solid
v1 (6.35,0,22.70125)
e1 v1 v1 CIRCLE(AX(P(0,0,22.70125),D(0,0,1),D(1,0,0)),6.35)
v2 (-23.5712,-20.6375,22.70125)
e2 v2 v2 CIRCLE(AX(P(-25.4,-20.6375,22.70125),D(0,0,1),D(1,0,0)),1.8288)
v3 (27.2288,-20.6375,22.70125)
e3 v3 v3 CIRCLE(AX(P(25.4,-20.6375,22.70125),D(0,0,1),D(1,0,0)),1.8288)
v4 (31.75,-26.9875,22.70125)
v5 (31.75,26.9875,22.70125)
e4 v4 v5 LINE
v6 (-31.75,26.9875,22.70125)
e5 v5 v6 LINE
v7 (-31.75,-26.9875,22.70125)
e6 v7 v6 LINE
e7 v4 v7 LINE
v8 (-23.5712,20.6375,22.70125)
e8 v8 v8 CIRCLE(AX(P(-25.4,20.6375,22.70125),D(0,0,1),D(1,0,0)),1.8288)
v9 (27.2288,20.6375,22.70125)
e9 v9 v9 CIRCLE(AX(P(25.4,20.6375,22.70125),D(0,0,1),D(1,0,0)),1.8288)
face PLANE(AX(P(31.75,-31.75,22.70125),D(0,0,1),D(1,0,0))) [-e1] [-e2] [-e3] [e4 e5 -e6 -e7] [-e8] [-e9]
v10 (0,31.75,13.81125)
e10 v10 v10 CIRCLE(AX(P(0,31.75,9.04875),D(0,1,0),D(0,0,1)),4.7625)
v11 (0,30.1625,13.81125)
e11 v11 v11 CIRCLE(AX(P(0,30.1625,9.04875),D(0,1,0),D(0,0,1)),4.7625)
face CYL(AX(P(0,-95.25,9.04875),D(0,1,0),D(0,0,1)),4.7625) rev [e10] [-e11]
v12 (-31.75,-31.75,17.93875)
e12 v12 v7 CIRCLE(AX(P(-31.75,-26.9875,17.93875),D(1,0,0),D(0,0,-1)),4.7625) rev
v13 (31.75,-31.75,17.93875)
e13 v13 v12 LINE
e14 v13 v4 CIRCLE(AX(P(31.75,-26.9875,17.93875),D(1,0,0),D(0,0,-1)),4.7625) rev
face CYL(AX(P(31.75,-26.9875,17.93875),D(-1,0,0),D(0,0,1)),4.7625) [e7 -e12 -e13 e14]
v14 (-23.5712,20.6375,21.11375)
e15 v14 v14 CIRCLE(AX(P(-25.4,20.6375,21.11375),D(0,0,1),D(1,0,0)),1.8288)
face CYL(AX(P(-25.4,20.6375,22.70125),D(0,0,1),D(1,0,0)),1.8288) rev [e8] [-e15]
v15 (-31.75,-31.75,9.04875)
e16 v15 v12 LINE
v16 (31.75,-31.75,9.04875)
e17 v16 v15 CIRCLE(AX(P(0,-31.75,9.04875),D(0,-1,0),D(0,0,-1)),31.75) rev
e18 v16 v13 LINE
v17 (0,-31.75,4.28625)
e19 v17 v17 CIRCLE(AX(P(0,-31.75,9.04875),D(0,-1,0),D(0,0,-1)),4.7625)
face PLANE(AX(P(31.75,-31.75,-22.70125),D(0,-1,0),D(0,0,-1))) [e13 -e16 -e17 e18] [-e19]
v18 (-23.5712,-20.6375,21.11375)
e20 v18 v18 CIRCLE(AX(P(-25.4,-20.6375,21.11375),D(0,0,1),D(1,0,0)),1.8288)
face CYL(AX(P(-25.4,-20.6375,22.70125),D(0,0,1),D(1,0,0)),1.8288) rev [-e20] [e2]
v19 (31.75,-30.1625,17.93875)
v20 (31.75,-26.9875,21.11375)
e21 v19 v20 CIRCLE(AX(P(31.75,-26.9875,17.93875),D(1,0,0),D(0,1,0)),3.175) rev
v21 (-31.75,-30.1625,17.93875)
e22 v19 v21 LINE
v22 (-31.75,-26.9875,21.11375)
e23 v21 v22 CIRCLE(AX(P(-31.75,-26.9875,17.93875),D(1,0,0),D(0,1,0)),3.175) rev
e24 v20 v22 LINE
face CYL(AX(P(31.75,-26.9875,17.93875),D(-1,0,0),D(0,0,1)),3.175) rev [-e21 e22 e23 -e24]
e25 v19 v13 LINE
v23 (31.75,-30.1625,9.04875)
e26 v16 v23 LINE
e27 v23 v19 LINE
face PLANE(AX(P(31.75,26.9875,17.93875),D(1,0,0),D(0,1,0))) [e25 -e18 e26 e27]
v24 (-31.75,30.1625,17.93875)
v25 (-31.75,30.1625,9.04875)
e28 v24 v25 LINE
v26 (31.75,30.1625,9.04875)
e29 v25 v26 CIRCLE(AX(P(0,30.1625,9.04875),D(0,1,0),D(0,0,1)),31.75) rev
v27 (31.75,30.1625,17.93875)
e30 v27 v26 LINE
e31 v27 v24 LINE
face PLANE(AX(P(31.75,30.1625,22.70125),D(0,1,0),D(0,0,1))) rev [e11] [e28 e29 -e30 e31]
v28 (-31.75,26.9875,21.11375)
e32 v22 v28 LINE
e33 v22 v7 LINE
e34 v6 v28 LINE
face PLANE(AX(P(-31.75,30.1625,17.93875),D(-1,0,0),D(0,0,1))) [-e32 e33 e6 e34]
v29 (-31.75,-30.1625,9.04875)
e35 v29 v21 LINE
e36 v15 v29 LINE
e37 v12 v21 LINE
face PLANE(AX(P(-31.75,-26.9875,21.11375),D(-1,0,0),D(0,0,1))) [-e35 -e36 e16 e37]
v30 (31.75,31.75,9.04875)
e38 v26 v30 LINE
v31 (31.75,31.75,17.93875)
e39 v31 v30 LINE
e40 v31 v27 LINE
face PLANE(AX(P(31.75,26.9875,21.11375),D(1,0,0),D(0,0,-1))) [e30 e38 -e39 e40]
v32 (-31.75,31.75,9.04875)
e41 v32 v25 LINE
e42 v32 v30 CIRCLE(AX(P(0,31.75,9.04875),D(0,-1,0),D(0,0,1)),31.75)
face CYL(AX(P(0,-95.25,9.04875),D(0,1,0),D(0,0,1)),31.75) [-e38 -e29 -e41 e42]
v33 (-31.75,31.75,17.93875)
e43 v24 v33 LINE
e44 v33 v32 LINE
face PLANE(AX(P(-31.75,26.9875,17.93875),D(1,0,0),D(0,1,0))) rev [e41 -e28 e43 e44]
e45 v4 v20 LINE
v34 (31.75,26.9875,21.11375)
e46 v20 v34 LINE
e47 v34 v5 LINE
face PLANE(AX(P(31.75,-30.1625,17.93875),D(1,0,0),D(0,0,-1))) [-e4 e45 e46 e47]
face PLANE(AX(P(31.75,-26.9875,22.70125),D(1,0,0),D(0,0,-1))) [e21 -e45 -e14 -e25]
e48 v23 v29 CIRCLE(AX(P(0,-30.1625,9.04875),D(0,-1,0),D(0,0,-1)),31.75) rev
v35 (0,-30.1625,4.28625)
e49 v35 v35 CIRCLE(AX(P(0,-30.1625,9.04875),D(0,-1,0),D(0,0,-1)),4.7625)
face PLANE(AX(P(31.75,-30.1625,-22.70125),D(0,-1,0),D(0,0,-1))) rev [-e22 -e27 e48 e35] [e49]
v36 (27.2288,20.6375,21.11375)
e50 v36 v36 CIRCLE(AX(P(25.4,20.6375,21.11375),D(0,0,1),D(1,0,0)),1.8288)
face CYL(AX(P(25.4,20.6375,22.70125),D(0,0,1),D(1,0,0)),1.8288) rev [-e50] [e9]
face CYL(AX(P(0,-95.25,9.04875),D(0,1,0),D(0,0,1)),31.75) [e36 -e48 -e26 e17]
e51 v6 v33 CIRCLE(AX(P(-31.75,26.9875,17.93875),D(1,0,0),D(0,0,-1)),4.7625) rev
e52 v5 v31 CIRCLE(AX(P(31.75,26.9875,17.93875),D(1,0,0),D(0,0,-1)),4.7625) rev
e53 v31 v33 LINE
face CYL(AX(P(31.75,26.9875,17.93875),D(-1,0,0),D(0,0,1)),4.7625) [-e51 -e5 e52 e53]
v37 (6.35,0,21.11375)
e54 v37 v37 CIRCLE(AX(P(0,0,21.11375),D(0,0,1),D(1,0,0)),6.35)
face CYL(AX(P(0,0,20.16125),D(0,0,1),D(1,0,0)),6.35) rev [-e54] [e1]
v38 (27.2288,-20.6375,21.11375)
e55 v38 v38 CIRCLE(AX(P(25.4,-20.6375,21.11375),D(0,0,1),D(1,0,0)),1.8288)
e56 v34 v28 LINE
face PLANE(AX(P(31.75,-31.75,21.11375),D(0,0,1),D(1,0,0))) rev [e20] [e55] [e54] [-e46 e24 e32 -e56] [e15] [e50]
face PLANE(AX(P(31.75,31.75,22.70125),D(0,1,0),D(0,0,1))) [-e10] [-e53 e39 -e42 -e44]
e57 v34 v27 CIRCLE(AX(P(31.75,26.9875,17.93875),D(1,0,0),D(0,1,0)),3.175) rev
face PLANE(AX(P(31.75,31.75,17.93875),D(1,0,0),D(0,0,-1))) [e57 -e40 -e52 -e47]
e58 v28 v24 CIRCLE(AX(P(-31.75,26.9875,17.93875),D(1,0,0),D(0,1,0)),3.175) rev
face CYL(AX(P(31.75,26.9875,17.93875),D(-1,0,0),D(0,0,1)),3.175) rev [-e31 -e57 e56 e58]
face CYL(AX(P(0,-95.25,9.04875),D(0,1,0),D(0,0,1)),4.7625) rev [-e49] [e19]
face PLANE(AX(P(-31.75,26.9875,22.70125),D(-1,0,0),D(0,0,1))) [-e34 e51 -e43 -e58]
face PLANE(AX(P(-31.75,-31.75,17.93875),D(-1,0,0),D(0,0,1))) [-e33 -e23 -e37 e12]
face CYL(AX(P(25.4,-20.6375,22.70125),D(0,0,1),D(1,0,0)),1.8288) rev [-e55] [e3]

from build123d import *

# Parameters (mm, degrees)
BASE_FLANGE1_DEPTH          = 31.75
SKETCH6_R                   = 4.7625
CUT_EXTRUDE1_DEPTH          = 127
F_27_0_144_DIAMETER_HOLE1_D = 3.6576
SKETCH11_R                  = 6.35
CUT_EXTRUDE2_DEPTH          = 2.54


# Sheet-metal steps are written as plain solids
with BuildPart() as part:
    # Sketch1 → Base-Flange1 (new, symmetric)
    with BuildSketch(Plane.YZ):
        with BuildLine():
            Line((-31.75, -22.70125), (-31.75, 17.93875))
            ThreePointArc((-31.75, 17.93875), (-30.355096045, 21.306346045), (-26.9875, 22.70125))
            Line((-26.9875, 22.70125), (26.9875, 22.70125))
            ThreePointArc((26.9875, 22.70125), (30.355096045, 21.306346045), (31.75, 17.93875))
            Line((31.75, 17.93875), (31.75, -22.70125))
            Line((31.75, -22.70125), (30.1625, -22.70125))
            Line((30.1625, -22.70125), (30.1625, 17.93875))
            ThreePointArc((30.1625, 17.93875), (29.23256403, 20.18381403), (26.9875, 21.11375))
            Line((26.9875, 21.11375), (-26.9875, 21.11375))
            ThreePointArc((-26.9875, 21.11375), (-29.23256403, 20.18381403), (-30.1625, 17.93875))
            Line((-30.1625, 17.93875), (-30.1625, -22.70125))
            Line((-30.1625, -22.70125), (-31.75, -22.70125))
        make_face()
    extrude(amount=BASE_FLANGE1_DEPTH, both=True)

    # Sketch6 → Cut-Extrude1 (cut)
    with BuildSketch(Plane(origin=(0, 31.75, 0), x_dir=(-1, 0, 0), z_dir=(0, 1, 0))):
        with Locations(Location((0, 9.04875, 0), (0, 0, 270))):
            Circle(SKETCH6_R)
        with BuildLine():
            Line((-31.75, 9.04875), (-31.75, -117.95125))
            Line((-31.75, -117.95125), (31.75, -117.95125))
            Line((31.75, -117.95125), (31.75, 9.04875))
            ThreePointArc((31.75, 9.04875), (0, -22.70125), (-31.75, 9.04875))
        make_face()
    extrude(amount=-CUT_EXTRUDE1_DEPTH, mode=Mode.SUBTRACT)

    # #27 (0.144) Diameter Hole1 (through all)
    with Locations(Plane.XY.offset(22.70125)):
        with Locations((-25.4, 20.6375), (25.4, 20.6375), (25.4, -20.6375), (-25.4, -20.6375)):
            Hole(F_27_0_144_DIAMETER_HOLE1_D / 2)

    # Sketch11 → Cut-Extrude2 (cut)
    with BuildSketch(Plane.XY.offset(22.70125)):
        Circle(SKETCH11_R)
    extrude(amount=-CUT_EXTRUDE2_DEPTH, mode=Mode.SUBTRACT)


solid = part.part
